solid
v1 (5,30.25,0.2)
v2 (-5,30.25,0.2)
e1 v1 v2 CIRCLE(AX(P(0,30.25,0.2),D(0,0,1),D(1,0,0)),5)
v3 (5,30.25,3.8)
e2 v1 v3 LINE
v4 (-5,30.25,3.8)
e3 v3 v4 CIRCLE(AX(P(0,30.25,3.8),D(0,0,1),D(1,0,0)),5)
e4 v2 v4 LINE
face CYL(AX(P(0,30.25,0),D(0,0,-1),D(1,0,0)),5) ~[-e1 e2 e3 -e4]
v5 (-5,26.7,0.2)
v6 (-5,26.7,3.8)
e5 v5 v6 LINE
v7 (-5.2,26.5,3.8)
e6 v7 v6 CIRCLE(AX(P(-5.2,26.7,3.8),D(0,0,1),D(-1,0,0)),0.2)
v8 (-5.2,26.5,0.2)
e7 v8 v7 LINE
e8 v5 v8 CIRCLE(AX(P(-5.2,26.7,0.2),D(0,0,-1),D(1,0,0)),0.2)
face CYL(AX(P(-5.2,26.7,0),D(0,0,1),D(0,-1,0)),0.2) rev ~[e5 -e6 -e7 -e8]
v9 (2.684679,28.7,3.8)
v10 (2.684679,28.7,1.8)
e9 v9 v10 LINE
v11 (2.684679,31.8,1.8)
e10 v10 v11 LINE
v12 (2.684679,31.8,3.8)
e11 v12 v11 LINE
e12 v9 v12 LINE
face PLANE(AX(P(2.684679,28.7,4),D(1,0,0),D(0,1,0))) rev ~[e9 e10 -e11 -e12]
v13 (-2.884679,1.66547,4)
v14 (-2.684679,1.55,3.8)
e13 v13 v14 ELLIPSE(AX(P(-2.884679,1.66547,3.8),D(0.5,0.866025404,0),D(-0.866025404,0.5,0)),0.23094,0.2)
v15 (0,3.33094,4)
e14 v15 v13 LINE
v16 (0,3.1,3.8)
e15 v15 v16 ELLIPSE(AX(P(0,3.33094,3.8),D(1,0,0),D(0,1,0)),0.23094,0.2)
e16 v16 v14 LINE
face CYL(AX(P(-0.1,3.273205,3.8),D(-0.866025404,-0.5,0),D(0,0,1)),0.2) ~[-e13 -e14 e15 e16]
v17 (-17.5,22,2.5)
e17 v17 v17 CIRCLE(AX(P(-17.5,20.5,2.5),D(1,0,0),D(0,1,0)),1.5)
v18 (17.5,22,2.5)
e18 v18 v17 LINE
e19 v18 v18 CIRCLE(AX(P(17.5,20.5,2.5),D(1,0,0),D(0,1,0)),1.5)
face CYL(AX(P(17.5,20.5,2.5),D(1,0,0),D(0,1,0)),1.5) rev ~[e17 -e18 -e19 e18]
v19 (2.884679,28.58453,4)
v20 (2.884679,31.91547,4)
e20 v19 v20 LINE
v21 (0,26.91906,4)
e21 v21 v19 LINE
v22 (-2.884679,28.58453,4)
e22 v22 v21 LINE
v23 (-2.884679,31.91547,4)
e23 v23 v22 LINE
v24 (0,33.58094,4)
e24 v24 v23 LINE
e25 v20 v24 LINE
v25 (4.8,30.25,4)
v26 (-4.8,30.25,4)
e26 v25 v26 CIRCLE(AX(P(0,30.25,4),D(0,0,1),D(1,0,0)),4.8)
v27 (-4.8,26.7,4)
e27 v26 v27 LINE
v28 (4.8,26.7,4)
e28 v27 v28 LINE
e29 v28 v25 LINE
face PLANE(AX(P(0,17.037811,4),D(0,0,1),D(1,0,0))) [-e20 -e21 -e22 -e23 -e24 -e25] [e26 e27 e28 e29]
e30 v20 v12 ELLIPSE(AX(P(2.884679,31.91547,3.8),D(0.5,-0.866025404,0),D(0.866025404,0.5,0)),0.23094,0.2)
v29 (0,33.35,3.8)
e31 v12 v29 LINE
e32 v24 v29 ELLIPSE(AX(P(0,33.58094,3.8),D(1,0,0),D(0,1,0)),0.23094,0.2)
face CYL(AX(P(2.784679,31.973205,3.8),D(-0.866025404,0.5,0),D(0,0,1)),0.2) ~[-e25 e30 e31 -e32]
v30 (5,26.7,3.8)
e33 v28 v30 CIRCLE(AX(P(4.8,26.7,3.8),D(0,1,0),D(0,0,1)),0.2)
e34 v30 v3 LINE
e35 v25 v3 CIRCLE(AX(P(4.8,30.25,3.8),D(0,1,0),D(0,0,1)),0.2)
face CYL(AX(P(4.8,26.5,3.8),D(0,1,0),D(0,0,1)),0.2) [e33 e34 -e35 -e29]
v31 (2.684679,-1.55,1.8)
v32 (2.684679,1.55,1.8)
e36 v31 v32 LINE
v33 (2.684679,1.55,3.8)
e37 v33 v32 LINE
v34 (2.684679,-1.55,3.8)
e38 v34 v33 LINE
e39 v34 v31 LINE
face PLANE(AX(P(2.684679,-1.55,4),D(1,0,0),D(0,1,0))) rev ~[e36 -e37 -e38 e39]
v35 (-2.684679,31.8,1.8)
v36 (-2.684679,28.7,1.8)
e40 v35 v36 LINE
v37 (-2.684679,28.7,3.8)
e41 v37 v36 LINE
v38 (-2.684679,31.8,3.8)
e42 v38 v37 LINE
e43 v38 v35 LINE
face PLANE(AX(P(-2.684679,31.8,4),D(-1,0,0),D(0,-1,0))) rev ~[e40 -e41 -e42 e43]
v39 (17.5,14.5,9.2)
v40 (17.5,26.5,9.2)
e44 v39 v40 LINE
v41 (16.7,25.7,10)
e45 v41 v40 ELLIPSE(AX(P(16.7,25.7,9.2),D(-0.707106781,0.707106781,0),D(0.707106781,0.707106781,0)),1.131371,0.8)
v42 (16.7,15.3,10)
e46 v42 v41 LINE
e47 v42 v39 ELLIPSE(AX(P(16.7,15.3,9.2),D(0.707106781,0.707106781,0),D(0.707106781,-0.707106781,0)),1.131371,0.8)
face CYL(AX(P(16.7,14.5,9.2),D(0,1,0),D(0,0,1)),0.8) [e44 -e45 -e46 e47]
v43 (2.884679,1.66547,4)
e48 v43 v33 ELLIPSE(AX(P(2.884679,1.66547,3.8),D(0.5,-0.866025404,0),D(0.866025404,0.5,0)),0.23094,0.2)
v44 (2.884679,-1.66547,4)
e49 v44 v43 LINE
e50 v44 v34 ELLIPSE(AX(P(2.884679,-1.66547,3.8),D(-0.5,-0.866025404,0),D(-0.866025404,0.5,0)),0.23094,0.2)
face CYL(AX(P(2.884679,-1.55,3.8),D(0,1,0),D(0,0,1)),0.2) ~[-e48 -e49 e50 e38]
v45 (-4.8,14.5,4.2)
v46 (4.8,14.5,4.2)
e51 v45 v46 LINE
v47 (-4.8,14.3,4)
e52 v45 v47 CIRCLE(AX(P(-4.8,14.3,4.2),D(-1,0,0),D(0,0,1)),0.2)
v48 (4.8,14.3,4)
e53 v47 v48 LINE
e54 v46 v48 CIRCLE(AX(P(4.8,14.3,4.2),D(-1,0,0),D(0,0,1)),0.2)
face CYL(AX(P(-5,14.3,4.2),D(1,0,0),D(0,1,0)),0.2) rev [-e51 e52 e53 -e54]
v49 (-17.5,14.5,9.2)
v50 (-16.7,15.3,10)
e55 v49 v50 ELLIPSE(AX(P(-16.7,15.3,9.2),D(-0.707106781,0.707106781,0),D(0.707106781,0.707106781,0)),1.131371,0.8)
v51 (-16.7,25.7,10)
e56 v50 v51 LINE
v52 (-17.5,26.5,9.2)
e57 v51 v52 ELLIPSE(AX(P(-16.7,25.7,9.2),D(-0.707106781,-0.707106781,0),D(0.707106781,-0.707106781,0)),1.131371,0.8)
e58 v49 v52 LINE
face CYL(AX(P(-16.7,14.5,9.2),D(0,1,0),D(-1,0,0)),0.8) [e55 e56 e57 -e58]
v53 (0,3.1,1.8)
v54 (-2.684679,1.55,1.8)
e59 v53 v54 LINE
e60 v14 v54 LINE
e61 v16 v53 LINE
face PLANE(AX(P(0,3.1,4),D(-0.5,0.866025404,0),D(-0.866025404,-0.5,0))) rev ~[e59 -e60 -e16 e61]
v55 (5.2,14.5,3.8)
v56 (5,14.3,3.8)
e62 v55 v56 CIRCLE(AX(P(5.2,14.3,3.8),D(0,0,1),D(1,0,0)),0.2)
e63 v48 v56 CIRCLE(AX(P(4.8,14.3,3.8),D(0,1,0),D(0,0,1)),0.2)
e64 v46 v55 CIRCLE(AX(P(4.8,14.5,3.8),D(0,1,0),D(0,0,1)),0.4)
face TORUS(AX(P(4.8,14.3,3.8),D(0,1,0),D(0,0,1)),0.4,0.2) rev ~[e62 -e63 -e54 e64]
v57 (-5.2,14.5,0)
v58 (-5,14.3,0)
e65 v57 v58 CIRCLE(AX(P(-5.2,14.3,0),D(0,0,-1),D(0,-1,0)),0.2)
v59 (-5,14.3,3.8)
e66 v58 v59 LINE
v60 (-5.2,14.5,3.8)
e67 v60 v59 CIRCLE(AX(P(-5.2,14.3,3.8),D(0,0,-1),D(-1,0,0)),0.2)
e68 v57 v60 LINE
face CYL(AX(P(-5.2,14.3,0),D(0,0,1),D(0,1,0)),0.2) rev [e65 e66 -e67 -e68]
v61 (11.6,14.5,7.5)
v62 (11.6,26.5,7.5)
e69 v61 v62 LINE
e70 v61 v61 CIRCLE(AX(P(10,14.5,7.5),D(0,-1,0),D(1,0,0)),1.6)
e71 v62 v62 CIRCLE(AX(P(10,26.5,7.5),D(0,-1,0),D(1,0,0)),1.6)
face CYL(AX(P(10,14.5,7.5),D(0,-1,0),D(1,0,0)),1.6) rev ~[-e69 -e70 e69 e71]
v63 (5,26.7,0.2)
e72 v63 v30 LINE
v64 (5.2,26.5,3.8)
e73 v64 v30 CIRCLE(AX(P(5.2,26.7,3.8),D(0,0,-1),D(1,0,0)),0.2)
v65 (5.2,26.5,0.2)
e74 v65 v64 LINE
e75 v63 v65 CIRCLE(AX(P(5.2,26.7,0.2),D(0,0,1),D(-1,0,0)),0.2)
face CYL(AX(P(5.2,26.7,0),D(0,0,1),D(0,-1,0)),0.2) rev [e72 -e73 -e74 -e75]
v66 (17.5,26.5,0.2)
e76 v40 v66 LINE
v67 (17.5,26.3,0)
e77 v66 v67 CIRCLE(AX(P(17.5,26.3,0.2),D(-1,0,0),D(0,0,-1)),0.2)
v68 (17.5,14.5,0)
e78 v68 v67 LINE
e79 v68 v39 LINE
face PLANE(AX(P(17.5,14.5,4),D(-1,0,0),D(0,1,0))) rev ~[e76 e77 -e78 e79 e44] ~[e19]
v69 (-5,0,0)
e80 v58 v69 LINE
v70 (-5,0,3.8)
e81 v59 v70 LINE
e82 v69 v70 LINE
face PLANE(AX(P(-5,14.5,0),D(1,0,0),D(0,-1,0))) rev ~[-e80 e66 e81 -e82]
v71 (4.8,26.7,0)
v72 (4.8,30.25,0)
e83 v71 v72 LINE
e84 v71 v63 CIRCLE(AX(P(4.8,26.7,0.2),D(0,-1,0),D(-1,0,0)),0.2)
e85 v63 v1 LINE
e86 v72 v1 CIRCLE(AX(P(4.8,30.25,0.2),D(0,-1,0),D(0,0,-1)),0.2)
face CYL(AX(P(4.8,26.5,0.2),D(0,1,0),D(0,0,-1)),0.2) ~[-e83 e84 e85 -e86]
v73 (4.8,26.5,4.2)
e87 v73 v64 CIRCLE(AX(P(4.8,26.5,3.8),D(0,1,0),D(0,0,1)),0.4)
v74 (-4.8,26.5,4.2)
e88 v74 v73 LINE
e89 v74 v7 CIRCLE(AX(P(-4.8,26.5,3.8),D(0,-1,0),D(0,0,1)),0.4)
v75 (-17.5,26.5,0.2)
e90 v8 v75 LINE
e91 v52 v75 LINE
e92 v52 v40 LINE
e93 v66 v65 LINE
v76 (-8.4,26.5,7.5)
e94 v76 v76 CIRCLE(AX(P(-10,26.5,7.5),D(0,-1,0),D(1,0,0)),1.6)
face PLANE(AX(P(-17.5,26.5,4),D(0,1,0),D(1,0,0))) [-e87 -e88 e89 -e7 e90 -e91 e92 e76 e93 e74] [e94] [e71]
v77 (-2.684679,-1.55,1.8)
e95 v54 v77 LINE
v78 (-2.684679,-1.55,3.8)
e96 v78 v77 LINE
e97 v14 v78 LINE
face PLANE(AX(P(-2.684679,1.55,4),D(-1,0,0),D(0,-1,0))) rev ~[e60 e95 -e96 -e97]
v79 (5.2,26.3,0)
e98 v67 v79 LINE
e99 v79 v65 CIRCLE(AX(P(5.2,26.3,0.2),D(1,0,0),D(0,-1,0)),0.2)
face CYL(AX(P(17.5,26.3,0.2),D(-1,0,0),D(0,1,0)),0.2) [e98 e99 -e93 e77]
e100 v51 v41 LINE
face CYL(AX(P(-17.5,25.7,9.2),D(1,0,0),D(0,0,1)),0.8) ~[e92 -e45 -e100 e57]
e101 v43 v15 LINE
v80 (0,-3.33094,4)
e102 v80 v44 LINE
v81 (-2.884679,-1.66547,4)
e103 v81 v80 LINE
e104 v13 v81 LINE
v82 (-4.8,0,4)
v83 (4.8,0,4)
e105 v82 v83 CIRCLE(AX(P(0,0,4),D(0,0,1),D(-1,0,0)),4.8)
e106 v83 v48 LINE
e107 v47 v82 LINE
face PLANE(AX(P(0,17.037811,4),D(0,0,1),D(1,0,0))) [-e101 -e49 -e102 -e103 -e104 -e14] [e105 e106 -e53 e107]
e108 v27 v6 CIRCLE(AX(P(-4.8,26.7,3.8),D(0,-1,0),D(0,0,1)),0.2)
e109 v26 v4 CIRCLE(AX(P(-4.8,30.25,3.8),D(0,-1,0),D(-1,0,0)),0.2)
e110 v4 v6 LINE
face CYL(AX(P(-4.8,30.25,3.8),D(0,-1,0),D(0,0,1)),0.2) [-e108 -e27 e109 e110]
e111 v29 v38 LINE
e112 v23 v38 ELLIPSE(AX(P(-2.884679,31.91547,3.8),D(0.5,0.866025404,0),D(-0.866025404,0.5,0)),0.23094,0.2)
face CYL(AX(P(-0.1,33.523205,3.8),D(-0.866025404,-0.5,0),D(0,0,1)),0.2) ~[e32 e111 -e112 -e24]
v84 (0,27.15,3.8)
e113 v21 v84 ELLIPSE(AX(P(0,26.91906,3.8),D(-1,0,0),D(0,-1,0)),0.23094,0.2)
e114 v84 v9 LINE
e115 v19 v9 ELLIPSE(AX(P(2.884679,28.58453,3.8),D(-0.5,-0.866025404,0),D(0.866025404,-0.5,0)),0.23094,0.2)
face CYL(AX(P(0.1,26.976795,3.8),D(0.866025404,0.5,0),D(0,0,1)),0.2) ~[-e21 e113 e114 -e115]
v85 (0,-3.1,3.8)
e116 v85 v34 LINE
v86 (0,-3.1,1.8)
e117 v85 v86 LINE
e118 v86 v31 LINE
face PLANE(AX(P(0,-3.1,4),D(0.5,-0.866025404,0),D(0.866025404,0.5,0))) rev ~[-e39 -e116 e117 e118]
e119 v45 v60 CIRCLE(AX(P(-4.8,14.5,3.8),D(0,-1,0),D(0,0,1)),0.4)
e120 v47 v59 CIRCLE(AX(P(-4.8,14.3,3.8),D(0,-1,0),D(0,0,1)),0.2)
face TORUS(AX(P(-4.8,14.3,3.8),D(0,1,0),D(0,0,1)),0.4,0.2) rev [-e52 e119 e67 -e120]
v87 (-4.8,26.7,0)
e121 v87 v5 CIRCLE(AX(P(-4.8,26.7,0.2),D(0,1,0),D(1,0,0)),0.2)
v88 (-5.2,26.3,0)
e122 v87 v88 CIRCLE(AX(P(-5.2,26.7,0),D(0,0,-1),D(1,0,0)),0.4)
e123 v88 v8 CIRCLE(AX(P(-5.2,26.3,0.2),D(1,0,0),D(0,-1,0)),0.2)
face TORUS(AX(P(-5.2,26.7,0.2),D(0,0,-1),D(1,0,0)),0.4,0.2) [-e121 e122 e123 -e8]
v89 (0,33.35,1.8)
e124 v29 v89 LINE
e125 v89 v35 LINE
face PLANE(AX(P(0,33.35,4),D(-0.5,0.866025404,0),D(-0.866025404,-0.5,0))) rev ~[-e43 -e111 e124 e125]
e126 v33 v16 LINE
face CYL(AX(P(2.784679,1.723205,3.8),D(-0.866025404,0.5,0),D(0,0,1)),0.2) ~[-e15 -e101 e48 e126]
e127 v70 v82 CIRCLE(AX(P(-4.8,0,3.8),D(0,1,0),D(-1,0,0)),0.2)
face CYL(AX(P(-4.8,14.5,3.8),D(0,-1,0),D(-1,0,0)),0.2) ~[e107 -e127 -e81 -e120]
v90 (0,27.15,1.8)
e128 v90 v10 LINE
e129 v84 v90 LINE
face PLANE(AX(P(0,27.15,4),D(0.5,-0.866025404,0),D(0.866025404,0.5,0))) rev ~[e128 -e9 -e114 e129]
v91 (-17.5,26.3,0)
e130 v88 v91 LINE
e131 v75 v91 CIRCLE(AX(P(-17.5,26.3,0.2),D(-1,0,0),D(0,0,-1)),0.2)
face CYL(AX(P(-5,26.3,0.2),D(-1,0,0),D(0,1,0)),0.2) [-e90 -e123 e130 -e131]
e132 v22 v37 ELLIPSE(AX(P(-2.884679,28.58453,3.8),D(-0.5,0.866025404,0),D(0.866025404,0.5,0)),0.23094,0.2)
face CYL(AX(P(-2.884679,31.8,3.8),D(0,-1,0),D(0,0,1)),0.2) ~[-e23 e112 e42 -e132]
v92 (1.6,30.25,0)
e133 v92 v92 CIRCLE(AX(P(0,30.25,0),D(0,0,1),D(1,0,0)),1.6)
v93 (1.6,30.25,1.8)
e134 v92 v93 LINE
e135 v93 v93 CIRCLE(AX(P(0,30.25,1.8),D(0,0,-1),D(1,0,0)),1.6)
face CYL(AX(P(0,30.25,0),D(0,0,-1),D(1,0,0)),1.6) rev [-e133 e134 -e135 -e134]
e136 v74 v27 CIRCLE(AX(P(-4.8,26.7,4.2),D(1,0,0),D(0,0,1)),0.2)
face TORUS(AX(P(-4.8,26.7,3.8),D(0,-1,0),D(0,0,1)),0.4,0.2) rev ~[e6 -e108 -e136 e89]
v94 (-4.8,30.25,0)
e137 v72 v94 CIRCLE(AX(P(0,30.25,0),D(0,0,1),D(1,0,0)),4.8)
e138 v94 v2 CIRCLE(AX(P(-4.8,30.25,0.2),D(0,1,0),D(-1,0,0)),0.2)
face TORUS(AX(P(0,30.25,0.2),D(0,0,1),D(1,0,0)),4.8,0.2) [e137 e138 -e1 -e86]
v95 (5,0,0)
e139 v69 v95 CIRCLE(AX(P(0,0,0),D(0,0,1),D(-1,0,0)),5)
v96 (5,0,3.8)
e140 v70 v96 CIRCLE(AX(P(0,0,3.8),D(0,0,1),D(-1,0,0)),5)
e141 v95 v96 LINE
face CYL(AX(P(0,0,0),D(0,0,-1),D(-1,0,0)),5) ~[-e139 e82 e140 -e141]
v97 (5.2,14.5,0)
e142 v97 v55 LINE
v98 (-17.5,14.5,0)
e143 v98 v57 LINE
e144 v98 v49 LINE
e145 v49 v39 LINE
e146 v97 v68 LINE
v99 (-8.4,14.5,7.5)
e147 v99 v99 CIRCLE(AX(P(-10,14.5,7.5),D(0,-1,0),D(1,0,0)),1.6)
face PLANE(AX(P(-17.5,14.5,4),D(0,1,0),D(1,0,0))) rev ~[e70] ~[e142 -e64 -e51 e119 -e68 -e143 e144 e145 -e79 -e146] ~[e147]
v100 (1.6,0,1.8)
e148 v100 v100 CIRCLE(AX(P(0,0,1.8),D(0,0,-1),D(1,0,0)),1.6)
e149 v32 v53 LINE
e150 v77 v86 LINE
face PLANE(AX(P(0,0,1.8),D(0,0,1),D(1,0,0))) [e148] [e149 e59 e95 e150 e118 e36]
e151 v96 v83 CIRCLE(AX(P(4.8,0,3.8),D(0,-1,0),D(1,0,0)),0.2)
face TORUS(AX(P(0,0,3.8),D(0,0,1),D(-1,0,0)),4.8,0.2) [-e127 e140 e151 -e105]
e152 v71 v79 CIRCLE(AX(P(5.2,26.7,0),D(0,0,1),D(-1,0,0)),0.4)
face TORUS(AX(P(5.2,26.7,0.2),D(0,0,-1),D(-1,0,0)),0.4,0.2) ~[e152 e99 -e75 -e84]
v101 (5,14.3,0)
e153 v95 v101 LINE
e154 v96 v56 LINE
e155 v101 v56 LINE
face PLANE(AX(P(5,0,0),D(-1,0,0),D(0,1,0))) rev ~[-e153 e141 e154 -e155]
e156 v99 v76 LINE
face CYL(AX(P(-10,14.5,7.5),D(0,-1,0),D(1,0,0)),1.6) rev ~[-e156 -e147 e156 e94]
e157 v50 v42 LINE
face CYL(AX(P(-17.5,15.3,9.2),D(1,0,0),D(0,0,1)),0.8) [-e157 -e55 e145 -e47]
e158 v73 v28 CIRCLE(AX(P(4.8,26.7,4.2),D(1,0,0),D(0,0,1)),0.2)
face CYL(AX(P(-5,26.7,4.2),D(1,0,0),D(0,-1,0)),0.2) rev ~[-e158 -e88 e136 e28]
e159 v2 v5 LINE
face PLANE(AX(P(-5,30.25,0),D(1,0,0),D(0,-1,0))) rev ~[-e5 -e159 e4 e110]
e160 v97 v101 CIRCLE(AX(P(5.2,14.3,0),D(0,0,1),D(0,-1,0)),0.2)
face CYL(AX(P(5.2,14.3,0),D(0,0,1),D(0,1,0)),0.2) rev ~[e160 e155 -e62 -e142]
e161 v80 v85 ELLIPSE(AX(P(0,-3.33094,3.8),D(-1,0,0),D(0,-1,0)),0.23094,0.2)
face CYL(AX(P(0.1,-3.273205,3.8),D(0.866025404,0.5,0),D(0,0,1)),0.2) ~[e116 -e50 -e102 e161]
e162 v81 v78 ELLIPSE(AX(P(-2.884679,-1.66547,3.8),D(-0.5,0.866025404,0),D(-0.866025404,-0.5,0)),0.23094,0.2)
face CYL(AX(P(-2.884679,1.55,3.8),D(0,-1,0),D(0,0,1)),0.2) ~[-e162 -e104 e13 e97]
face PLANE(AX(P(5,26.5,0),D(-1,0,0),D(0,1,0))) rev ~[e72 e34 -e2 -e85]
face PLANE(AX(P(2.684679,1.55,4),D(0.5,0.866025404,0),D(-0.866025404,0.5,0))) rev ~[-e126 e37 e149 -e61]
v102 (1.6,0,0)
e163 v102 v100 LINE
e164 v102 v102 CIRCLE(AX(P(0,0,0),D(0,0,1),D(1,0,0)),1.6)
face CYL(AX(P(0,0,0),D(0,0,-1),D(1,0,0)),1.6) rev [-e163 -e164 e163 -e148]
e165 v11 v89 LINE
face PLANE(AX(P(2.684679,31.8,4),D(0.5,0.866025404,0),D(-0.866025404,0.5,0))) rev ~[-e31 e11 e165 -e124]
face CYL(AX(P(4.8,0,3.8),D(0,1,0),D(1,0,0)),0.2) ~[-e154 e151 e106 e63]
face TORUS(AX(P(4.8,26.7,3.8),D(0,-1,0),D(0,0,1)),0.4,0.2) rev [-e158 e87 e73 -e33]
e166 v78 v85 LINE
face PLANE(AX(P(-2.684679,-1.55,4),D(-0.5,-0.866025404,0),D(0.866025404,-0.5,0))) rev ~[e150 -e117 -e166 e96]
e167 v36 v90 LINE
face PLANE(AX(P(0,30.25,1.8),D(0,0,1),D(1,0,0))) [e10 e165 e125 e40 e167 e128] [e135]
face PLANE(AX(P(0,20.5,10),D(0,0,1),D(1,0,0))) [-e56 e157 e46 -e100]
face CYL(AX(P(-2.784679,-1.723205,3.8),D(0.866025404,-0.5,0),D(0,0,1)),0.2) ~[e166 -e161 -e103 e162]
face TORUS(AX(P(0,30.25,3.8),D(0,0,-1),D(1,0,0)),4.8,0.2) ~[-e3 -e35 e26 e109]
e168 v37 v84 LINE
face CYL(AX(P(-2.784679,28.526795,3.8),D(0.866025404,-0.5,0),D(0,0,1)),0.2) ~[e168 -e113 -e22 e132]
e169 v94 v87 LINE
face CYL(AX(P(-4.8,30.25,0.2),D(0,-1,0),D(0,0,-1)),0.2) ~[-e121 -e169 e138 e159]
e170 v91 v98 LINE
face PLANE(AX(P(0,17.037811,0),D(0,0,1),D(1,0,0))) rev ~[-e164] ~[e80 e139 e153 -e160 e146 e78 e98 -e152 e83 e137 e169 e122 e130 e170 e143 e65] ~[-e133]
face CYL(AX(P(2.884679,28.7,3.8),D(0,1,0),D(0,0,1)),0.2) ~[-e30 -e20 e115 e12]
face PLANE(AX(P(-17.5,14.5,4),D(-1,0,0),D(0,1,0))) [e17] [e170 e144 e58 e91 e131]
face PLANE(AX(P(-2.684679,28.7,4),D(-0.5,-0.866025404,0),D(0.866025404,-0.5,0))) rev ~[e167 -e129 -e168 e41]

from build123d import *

# Parameters (mm, degrees)
F0_R      = 1.6
F1_DEPTH  = 4
F2_W      = 35
F2_H      = 12
F3_DEPTH  = 6
F4_R      = 1.6
F5_DEPTH  = 20.751
F6_R      = 0.8
F7_R      = 1.5
F8_DEPTH  = 35.001
F10_DEPTH = 2.2
F11_R     = 0.2


with BuildPart() as f1:
    # F0 (on Top) → F1 (new body)
    with BuildSketch(Plane.XY):
        with BuildLine():
            ThreePointArc((5, 30.25), (0, 35.25), (-5, 30.25))
            Line((-5, 30.25), (-5, 26.5))
            Line((-5, 26.5), (-17.5, 26.5))
            Line((-17.5, 26.5), (-17.5, 14.5))
            Line((-17.5, 14.5), (-5, 14.5))
            Line((-5, 14.5), (-5, 0))
            ThreePointArc((-5, 0), (0, -5), (5, 0))
            Line((5, 0), (5, 14.5))
            Line((5, 14.5), (17.5, 14.5))
            Line((17.5, 14.5), (17.5, 26.5))
            Line((17.5, 26.5), (5, 26.5))
            Line((5, 26.5), (5, 30.25))
        make_face()
        Circle(F0_R, mode=Mode.SUBTRACT)
        with Locations((0, 30.25)):
            Circle(F0_R, mode=Mode.SUBTRACT)
    extrude(amount=F1_DEPTH)

    # F2 (on face) → F3 (join)
    with BuildSketch(Plane.XY.offset(4)):
        with Locations((0, 20.5)):
            Rectangle(F2_W, F2_H)
    extrude(amount=F3_DEPTH)

    # F4 (on face) → F5 (cut, through all)
    with BuildSketch(Plane.XZ.offset(-14.5)):
        with Locations((-10, 7.5)):
            Circle(F4_R)
        with Locations((10, 7.5)):
            Circle(F4_R)
    extrude(amount=-F5_DEPTH, mode=Mode.SUBTRACT)

    # F6
    f6_edges = [f1.edges().sort_by_distance(p)[0] for p in [
        (0, 26.5, 10),
        (-17.5, 20.5, 10),
        (0, 14.5, 10),
        (17.5, 20.5, 10),
    ]]
    fillet(f6_edges, radius=F6_R)

    # F7 (on face) → F8 (cut, through all)
    with BuildSketch(Plane.YZ.offset(17.5)):
        with Locations((20.5, 2.5)):
            Circle(F7_R)
    extrude(amount=-F8_DEPTH, mode=Mode.SUBTRACT)

    # F9 (on face) → F10 (cut)
    with BuildSketch(Plane.XY.offset(4)):
        Polygon((-2.6846787517, 28.7), (0, 27.15), (2.6846787517, 28.7), (2.6846787517, 31.8), (0, 33.35), (-2.6846787517, 31.8), align=None)
        Polygon((2.6846787517, 1.55), (0, 3.1), (-2.6846787517, 1.55), (-2.6846787517, -1.55), (0, -3.1), (2.6846787517, -1.55), align=None)
    extrude(amount=-F10_DEPTH, mode=Mode.SUBTRACT)

    # F11
    f11_edges = [f1.edges().sort_by_distance(p)[0] for p in [
        (5, 7.25, 4),
        (0, -5, 4),
        (0, 14.5, 4),
        (-5, 7.25, 4),
        (2.684679, 0, 4),
        (1.342339, 2.325, 4),
        (-1.342339, 2.325, 4),
        (-2.684679, 0, 4),
        (-1.342339, -2.325, 4),
        (1.342339, -2.325, 4),
        (5, 28.375, 4),
        (0, 26.5, 4),
        (0, 35.25, 4),
        (-5, 28.375, 4),
        (-1.342339, 27.925, 4),
        (1.342339, 27.925, 4),
        (2.684679, 30.25, 4),
        (1.342339, 32.575, 4),
        (-1.342339, 32.575, 4),
        (-2.684679, 30.25, 4),
        (-5, 30.25, 2),
        (-5, 26.5, 2),
        (-5, 28.375, 0),
        (11.25, 26.5, 0),
        (5, 26.5, 2),
        (-11.25, 26.5, 0),
        (0, 35.25, 0),
        (5, 28.375, 0),
        (-5, 14.5, 2),
        (5, 14.5, 2),
    ]]
    fillet(f11_edges, radius=F11_R)


solid = f1.part
